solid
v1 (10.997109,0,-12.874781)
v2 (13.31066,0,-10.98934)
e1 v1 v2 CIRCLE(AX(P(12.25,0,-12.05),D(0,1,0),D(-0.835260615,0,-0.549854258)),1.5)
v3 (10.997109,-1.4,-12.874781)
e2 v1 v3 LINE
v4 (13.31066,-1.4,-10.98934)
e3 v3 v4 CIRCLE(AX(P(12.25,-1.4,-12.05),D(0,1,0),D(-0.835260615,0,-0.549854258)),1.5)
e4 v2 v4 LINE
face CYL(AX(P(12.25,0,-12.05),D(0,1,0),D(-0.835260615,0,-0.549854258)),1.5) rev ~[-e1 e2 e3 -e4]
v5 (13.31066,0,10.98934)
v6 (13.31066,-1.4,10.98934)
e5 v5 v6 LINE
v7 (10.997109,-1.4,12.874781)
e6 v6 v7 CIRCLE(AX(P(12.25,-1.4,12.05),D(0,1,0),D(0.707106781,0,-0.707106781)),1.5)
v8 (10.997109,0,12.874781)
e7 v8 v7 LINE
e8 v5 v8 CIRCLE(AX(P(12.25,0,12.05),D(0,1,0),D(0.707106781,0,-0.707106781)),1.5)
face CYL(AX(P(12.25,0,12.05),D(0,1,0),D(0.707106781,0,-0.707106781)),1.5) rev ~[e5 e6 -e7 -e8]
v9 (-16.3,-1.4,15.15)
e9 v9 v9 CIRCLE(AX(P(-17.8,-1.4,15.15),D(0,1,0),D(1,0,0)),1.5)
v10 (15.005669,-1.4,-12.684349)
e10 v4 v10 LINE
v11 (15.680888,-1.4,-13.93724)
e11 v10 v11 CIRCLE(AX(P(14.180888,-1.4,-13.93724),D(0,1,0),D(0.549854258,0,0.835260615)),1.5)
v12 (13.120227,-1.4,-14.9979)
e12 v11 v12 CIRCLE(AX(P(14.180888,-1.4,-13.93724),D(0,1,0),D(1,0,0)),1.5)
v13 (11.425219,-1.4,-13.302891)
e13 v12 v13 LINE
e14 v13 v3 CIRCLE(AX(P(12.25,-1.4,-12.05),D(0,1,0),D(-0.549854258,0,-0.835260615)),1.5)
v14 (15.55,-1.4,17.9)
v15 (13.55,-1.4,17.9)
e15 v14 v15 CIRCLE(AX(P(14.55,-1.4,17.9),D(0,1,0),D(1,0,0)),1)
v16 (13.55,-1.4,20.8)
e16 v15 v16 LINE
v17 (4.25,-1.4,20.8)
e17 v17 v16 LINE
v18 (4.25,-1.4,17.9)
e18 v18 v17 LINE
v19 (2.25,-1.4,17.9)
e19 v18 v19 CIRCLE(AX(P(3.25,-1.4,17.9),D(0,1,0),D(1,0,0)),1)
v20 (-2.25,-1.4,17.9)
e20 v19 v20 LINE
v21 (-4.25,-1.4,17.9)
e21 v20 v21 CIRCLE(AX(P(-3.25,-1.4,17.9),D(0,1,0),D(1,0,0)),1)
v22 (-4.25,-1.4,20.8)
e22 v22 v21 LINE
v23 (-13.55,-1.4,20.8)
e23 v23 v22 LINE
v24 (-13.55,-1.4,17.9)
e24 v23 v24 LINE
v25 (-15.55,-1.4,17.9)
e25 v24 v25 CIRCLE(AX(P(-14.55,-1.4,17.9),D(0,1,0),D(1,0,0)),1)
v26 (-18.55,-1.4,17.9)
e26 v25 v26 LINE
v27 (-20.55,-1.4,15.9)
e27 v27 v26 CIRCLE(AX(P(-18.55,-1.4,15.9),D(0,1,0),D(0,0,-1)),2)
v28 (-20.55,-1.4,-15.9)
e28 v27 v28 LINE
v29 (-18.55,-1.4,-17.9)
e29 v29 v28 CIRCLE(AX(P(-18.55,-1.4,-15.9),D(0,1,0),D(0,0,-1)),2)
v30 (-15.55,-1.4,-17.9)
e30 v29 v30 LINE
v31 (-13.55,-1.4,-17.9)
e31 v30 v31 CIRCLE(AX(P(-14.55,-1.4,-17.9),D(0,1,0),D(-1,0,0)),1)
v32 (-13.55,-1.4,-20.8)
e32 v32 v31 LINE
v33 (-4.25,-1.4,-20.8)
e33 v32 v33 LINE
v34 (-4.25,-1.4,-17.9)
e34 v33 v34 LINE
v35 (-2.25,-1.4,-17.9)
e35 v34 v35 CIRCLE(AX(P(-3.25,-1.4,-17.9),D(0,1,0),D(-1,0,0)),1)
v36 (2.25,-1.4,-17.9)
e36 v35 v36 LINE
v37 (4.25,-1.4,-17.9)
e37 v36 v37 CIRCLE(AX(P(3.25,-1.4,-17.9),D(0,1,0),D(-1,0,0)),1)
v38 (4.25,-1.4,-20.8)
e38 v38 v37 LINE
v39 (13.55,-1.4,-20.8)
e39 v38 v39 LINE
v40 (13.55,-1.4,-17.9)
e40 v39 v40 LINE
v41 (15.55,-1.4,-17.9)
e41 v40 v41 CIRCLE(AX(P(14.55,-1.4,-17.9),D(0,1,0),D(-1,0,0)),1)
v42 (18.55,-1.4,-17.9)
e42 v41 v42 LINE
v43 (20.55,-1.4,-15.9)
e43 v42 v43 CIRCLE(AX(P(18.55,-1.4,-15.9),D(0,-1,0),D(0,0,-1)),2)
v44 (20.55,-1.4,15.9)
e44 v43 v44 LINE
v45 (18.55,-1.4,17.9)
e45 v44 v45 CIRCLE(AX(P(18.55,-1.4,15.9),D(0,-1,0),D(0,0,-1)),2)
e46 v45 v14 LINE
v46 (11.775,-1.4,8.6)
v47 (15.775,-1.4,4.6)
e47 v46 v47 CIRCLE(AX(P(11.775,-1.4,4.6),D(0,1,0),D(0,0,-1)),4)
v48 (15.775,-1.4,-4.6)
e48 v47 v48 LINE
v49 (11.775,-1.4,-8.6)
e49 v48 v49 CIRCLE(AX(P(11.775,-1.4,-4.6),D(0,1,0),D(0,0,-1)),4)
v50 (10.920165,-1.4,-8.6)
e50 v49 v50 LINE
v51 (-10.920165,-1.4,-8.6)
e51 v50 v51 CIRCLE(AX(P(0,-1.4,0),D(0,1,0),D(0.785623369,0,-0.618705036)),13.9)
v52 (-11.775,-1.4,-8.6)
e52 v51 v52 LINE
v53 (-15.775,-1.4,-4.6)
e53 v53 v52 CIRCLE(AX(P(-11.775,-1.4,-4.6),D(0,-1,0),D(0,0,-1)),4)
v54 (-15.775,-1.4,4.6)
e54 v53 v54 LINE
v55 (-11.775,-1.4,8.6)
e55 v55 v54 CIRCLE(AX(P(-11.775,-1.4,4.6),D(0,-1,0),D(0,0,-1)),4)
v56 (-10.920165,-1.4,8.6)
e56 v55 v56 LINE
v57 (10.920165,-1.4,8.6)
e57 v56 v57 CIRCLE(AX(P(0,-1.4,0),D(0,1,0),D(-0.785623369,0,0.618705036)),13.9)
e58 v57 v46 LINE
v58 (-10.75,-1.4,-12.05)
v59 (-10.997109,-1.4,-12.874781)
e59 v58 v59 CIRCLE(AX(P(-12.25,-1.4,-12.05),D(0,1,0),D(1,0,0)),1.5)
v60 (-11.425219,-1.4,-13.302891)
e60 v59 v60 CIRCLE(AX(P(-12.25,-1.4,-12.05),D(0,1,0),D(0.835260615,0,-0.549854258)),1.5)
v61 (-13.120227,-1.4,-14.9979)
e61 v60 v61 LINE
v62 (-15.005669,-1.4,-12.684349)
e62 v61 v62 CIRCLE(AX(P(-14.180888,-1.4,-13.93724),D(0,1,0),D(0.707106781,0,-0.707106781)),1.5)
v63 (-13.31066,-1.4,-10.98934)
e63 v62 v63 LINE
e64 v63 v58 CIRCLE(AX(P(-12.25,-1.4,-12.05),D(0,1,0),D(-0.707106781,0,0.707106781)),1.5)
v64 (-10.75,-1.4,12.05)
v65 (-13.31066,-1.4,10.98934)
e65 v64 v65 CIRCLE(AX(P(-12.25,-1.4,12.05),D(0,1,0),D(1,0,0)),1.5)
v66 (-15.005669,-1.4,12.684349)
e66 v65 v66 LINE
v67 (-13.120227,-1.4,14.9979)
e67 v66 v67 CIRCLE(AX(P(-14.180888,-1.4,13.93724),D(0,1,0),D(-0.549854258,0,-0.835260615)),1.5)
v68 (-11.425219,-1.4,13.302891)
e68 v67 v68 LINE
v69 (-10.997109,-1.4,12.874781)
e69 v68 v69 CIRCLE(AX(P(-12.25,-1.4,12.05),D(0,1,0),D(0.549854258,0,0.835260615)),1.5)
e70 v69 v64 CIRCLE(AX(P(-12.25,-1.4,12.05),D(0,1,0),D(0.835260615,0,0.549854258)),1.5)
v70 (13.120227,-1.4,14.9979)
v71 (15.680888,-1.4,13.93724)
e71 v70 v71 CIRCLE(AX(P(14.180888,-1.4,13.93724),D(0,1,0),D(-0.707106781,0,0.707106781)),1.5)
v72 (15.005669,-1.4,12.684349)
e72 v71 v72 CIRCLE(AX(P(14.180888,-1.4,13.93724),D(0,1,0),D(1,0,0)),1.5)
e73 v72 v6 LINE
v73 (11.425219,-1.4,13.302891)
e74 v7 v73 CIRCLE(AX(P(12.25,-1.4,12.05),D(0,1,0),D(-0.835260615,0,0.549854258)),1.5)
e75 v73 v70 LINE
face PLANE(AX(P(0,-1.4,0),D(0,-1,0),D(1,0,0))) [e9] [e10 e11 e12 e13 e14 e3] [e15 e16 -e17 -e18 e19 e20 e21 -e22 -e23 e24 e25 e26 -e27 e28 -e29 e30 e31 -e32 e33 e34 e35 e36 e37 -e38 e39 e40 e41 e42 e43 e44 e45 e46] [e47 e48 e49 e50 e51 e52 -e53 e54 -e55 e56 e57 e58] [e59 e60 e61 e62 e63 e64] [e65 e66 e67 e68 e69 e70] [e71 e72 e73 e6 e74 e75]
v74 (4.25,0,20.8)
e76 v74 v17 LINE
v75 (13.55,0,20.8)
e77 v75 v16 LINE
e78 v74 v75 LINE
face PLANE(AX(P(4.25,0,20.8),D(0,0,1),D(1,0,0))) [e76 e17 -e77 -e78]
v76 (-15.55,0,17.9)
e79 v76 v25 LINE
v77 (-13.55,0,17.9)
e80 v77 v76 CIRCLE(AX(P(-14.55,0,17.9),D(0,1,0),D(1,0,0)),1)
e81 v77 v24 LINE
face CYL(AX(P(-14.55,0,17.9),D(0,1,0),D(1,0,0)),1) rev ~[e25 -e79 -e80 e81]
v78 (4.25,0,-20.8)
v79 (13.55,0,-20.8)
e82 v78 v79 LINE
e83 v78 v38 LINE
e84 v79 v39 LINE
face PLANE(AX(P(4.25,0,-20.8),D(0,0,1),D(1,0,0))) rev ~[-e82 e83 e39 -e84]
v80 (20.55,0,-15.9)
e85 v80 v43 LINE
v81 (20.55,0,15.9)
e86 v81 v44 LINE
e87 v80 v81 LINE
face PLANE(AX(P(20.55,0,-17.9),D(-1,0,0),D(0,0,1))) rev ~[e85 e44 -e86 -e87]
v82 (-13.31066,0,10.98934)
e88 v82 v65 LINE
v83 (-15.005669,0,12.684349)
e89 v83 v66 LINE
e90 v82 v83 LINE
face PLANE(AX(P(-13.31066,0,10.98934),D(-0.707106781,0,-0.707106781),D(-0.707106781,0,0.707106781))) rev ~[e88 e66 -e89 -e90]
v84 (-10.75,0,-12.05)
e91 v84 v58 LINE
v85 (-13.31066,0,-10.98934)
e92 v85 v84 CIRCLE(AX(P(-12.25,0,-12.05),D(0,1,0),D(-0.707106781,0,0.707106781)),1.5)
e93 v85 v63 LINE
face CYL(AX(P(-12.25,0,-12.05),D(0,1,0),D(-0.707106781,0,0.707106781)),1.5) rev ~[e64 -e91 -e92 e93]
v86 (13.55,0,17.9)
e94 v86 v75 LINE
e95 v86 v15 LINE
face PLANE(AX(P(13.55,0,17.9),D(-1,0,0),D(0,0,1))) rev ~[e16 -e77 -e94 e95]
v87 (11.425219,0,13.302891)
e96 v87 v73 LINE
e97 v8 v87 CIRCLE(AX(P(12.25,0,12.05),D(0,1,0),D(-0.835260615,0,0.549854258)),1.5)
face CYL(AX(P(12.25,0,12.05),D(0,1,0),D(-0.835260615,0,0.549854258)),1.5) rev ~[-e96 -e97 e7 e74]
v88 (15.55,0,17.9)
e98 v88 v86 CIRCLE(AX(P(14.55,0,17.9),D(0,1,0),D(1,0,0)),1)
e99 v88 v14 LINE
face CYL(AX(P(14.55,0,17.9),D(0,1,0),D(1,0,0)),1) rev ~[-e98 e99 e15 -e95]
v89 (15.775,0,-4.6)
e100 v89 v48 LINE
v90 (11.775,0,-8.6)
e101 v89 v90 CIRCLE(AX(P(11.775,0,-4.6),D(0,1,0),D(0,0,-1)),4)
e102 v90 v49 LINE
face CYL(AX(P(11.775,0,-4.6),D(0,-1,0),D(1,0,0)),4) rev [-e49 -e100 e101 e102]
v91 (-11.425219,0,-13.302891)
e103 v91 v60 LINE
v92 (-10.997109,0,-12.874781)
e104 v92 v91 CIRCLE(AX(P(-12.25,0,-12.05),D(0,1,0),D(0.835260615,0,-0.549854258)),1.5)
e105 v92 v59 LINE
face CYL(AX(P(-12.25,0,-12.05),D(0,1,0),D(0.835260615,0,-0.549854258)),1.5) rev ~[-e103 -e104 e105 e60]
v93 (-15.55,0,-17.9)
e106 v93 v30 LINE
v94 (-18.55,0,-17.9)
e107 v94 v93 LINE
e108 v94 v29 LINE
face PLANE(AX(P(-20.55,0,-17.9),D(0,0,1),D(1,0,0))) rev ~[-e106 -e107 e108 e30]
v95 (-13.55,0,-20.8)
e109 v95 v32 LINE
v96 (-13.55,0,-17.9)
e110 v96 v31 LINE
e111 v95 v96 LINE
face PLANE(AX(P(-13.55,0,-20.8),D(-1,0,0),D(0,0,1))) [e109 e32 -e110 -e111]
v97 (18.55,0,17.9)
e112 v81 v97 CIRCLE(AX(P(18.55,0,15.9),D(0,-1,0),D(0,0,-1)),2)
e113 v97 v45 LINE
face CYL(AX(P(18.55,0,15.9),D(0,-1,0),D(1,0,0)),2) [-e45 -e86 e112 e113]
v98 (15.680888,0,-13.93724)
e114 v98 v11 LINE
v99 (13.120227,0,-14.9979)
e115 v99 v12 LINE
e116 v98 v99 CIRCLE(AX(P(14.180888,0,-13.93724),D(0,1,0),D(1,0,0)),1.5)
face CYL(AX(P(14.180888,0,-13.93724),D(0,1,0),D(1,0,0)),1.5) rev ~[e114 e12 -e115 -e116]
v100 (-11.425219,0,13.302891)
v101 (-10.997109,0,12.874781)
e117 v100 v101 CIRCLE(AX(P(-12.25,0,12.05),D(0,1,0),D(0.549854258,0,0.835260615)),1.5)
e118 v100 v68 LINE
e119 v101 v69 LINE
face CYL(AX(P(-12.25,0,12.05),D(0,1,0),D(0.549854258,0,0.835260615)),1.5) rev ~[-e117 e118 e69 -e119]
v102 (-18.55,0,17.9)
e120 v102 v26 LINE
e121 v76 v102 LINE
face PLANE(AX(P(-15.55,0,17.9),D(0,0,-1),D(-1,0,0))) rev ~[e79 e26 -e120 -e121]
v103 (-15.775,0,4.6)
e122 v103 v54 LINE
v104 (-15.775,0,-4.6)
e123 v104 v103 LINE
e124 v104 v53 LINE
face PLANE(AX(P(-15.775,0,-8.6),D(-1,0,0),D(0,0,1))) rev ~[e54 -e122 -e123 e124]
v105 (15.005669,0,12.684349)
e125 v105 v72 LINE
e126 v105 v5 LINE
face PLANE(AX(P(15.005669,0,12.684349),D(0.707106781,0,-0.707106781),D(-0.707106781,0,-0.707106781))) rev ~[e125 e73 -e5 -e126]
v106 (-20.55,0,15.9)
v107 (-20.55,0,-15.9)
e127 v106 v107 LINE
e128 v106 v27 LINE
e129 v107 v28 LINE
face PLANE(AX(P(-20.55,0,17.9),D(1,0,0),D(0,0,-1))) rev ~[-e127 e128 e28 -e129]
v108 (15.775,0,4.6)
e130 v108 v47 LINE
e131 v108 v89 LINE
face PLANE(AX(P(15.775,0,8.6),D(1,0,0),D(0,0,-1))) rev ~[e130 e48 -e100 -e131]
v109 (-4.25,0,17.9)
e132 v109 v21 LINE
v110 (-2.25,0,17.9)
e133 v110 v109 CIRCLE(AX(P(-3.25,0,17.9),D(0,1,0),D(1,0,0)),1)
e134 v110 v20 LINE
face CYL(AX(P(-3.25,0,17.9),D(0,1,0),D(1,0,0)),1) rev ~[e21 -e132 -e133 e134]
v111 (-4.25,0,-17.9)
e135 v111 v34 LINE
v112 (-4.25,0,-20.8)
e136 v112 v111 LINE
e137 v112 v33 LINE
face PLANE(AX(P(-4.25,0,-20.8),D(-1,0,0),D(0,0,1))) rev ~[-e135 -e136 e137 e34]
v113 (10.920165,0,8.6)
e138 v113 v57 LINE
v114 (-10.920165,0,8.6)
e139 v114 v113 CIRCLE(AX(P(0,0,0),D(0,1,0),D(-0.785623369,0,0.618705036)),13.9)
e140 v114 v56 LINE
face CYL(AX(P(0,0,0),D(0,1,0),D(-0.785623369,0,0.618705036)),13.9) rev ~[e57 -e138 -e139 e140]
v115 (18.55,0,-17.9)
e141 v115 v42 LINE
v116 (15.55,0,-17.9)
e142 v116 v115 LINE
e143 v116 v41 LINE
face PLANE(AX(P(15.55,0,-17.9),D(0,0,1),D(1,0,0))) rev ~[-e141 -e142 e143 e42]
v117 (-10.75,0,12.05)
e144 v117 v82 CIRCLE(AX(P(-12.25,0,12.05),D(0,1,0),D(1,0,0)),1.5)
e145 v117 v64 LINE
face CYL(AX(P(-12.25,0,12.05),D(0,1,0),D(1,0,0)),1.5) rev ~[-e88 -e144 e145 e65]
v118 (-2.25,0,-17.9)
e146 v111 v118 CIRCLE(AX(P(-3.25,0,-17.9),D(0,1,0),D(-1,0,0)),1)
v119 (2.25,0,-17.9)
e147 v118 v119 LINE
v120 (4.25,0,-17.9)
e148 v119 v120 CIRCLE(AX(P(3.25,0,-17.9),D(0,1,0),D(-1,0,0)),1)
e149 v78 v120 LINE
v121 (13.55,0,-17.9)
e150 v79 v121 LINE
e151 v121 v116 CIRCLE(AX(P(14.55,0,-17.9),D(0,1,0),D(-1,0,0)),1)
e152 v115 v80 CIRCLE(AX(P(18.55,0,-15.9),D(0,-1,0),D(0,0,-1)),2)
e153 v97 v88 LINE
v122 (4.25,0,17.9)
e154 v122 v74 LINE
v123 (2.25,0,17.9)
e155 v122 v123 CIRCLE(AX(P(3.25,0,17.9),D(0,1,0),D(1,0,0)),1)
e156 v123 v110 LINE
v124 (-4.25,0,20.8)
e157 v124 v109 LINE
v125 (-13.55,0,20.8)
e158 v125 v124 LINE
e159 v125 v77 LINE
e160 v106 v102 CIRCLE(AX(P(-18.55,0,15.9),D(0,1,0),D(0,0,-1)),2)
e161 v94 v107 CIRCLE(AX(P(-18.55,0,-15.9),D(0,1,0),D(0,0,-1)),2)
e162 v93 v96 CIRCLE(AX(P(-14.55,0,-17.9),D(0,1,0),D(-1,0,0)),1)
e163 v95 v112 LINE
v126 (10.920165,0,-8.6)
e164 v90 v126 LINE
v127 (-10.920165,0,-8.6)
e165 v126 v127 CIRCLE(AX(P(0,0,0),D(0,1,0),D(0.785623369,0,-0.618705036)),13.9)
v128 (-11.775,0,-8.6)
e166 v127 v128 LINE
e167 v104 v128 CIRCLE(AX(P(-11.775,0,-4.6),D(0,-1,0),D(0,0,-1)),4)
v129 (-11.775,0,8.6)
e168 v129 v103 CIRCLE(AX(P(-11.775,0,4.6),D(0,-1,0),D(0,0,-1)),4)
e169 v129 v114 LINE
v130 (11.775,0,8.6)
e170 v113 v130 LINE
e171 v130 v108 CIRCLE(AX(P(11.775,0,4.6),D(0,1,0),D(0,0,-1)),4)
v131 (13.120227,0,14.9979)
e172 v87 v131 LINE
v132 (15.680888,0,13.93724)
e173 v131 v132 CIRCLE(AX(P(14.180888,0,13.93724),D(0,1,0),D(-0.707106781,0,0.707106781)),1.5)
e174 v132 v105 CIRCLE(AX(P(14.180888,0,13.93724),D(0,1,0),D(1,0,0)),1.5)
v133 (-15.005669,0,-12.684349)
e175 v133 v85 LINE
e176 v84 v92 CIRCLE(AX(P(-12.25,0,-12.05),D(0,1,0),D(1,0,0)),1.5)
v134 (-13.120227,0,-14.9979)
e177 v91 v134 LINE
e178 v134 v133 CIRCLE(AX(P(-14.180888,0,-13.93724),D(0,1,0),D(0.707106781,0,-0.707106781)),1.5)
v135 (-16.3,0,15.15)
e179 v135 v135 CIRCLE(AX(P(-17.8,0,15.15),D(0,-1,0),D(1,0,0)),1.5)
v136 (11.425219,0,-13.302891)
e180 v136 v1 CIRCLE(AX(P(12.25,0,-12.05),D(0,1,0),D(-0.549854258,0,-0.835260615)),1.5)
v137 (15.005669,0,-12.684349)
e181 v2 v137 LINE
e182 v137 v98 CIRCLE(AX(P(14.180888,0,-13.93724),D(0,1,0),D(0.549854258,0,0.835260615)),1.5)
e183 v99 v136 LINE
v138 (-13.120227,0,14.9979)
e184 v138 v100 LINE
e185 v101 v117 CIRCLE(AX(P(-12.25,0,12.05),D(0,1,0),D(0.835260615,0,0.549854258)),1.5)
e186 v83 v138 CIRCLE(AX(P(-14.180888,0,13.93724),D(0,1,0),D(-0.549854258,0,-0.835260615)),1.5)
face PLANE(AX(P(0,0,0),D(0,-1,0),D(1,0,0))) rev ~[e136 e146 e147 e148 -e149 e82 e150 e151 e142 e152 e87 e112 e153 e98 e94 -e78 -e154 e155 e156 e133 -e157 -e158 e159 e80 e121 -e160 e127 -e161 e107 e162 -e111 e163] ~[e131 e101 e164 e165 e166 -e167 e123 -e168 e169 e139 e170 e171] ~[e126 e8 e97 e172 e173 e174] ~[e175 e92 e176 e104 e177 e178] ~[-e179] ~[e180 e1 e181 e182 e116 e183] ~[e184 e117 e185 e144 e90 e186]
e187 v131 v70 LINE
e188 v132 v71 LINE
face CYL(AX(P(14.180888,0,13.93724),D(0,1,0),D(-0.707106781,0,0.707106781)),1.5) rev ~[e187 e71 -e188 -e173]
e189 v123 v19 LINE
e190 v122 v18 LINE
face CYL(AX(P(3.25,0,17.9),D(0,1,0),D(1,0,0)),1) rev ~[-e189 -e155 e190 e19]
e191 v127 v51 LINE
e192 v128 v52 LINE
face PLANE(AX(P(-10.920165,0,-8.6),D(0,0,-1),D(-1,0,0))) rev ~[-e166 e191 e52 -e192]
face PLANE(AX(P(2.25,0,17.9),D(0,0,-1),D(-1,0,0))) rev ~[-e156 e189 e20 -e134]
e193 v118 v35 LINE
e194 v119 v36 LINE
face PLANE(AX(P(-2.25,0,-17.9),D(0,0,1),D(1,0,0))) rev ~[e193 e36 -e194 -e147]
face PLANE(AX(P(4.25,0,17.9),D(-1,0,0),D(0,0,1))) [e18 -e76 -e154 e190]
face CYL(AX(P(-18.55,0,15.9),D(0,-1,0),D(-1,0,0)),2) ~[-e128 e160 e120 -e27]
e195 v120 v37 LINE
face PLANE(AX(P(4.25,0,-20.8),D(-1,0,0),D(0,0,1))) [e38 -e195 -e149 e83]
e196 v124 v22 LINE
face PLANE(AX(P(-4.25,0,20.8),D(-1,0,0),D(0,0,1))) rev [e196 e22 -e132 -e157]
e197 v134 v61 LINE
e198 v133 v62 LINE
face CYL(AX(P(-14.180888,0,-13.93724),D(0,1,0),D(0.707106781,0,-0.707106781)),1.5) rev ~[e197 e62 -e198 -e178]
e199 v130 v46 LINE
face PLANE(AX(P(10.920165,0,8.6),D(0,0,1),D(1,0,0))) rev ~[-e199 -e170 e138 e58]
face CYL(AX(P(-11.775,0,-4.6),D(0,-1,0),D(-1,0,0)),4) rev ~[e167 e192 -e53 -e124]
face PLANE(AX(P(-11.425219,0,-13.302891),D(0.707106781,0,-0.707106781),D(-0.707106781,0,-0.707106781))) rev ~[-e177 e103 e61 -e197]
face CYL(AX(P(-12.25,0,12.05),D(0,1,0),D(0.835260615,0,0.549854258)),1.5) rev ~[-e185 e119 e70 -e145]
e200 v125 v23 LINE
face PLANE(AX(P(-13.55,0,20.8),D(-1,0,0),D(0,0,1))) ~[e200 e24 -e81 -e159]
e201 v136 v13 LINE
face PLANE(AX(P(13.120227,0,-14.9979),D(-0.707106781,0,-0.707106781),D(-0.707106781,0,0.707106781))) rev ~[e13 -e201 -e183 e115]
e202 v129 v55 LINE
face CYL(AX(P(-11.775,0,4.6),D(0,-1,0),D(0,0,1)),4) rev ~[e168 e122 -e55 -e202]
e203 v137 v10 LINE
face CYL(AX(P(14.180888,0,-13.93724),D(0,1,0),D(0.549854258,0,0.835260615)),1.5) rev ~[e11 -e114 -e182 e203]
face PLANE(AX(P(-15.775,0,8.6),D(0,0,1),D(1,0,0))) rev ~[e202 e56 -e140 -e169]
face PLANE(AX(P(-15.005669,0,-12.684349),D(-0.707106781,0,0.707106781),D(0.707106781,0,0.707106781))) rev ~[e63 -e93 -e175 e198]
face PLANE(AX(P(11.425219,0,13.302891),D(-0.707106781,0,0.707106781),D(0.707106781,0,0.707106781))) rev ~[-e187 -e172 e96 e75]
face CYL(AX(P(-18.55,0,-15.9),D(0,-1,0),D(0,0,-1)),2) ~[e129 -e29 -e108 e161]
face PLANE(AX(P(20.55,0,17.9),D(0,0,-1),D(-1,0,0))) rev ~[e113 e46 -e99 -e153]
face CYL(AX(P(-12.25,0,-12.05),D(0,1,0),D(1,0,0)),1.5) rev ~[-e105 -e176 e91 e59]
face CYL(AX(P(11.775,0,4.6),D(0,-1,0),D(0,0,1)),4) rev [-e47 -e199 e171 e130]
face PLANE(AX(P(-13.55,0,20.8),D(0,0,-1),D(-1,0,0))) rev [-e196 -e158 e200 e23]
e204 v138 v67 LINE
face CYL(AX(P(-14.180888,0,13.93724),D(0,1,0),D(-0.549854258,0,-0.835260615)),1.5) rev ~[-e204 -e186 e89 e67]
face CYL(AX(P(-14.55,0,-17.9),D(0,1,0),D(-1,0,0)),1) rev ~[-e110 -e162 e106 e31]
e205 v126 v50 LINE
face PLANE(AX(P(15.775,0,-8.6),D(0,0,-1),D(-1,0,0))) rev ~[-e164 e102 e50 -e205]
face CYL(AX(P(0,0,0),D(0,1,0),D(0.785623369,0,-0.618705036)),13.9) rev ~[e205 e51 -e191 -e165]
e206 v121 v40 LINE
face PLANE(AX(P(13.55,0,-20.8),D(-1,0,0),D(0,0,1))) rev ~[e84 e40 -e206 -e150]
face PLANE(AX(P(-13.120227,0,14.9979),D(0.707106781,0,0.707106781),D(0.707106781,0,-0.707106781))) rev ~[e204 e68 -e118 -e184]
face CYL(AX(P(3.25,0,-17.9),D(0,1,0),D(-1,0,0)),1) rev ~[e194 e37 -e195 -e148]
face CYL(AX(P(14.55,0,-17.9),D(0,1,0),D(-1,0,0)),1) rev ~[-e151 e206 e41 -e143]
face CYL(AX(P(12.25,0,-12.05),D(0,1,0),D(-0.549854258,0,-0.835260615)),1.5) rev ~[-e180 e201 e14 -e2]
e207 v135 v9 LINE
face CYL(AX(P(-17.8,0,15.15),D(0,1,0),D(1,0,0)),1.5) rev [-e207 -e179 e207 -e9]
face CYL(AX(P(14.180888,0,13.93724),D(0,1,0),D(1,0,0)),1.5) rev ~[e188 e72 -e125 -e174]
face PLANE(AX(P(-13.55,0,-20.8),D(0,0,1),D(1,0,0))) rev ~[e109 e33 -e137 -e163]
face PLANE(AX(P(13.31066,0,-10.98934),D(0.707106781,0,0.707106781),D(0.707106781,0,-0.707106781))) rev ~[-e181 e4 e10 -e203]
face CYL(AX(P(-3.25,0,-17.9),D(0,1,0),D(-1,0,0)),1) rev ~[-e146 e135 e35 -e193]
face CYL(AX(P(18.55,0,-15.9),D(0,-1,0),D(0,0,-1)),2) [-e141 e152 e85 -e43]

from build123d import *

# Parameters (mm, degrees)
F0_R     = 1.5
F0_W     = 9.3
F0_H     = 2.9
F1_DEPTH = 1.4
F2_R     = 4
F3_DEPTH = 2
F4_R     = 2


# Not quite as in the source:
# - a pattern or mirror of a feature is missing from the dataset's text; its kind, count and spacing are read off the source's solid
# - a feature names something its author has since deleted; it is built from what else it names


with BuildPart() as f1:
    # F0 (on Front) → F1 (new body)
    with BuildSketch(Plane.XZ):
        with BuildLine():
            Line((15.55, -17.9), (20.55, -17.9))
            Line((20.55, -17.9), (20.55, 17.9))
            Line((20.55, 17.9), (15.55, 17.9))
            ThreePointArc((15.55, 17.9), (14.55, 16.9), (13.55, 17.9))
            Line((13.55, 17.9), (4.25, 17.9))
            ThreePointArc((4.25, 17.9), (3.25, 16.9), (2.25, 17.9))
            Line((2.25, 17.9), (-2.25, 17.9))
            ThreePointArc((-2.25, 17.9), (-3.25, 16.9), (-4.25, 17.9))
            Line((-4.25, 17.9), (-13.55, 17.9))
            ThreePointArc((-13.55, 17.9), (-14.55, 16.9), (-15.55, 17.9))
            Line((-15.55, 17.9), (-20.55, 17.9))
            Line((-20.55, 17.9), (-20.55, -17.9))
            Line((-20.55, -17.9), (-15.55, -17.9))
            ThreePointArc((-15.55, -17.9), (-14.55, -16.9), (-13.55, -17.9))
            Line((-13.55, -17.9), (-4.25, -17.9))
            ThreePointArc((-4.25, -17.9), (-3.25, -16.9), (-2.25, -17.9))
            Line((-2.25, -17.9), (2.25, -17.9))
            ThreePointArc((2.25, -17.9), (3.25, -16.9), (4.25, -17.9))
            Line((4.25, -17.9), (13.55, -17.9))
            ThreePointArc((13.55, -17.9), (14.55, -16.9), (15.55, -17.9))
        make_face()
        with BuildLine():
            ThreePointArc((-13.1202274148, -14.9978997242), (-15.343659863, -14.8848474001), (-15.0056689733, -12.6843486297))
            Line((-15.0056689733, -12.6843486297), (-13.3106601718, -10.9893398282))
            ThreePointArc((-13.3106601718, -10.9893398282), (-11.6759748515, -10.6641807012), (-10.75, -12.05))
            ThreePointArc((-10.75, -12.05), (-10.8131046691, -12.4805018095), (-10.9971090773, -12.8747813867))
            ThreePointArc((-10.9971090773, -12.8747813867), (-11.1893398282, -13.1106601718), (-11.4252186133, -13.3028909227))
            Line((-11.4252186133, -13.3028909227), (-13.1202274148, -14.9978997242))
        make_face(mode=Mode.SUBTRACT)
        with BuildLine():
            Line((13.3106601718, -10.9893398282), (15.0056689733, -12.6843486297))
            ThreePointArc((15.0056689733, -12.6843486297), (15.5013367677, -13.2256118689), (15.6808875866, -13.9372395524))
            ThreePointArc((15.6808875866, -13.9372395524), (14.7549127351, -15.3230588512), (13.1202274148, -14.9978997242))
            Line((13.1202274148, -14.9978997242), (11.4252186133, -13.3028909227))
            ThreePointArc((11.4252186133, -13.3028909227), (11.1893398282, -13.1106601718), (10.9971090773, -12.8747813867))
            ThreePointArc((10.9971090773, -12.8747813867), (11.3023921523, -10.8872277235), (13.3106601718, -10.9893398282))
        make_face(mode=Mode.SUBTRACT)
        with Locations((-17.8, 15.15)):
            Circle(F0_R, mode=Mode.SUBTRACT)
        with BuildLine():
            ThreePointArc((-15.0056689733, 12.6843486297), (-15.343659863, 14.8848474001), (-13.1202274148, 14.9978997242))
            Line((-13.1202274148, 14.9978997242), (-11.4252186133, 13.3028909227))
            ThreePointArc((-11.4252186133, 13.3028909227), (-11.1893398282, 13.1106601718), (-10.9971090773, 12.8747813867))
            ThreePointArc((-10.9971090773, 12.8747813867), (-10.8131046691, 12.4805018095), (-10.75, 12.05))
            ThreePointArc((-10.75, 12.05), (-11.6759748515, 10.6641807012), (-13.3106601718, 10.9893398282))
            Line((-13.3106601718, 10.9893398282), (-15.0056689733, 12.6843486297))
        make_face(mode=Mode.SUBTRACT)
        with BuildLine():
            ThreePointArc((-10.9201648339, 8.6), (0, 13.9), (10.9201648339, 8.6))
            Line((10.9201648339, 8.6), (15.775, 8.6))
            Line((15.775, 8.6), (15.775, -8.6))
            Line((15.775, -8.6), (10.9201648339, -8.6))
            ThreePointArc((10.9201648339, -8.6), (0, -13.9), (-10.9201648339, -8.6))
            Line((-10.9201648339, -8.6), (-15.775, -8.6))
            Line((-15.775, -8.6), (-15.775, 8.6))
            Line((-15.775, 8.6), (-10.9201648339, 8.6))
        make_face(mode=Mode.SUBTRACT)
        with BuildLine():
            ThreePointArc((13.1202274148, 14.9978997242), (14.7549127351, 15.3230588512), (15.6808875866, 13.9372395524))
            ThreePointArc((15.6808875866, 13.9372395524), (15.5013367677, 13.2256118689), (15.0056689733, 12.6843486297))
            Line((15.0056689733, 12.6843486297), (13.3106601718, 10.9893398282))
            ThreePointArc((13.3106601718, 10.9893398282), (11.3023921523, 10.8872277235), (10.9971090773, 12.8747813867))
            ThreePointArc((10.9971090773, 12.8747813867), (11.1893398282, 13.1106601718), (11.4252186133, 13.3028909227))
            Line((11.4252186133, 13.3028909227), (13.1202274148, 14.9978997242))
        make_face(mode=Mode.SUBTRACT)
        with Locations((-8.9, -19.35)):
            Rectangle(F0_W, F0_H)
        with Locations((8.9, -19.35)):
            Rectangle(F0_W, F0_H)
        with Locations((8.9, 19.35)):
            Rectangle(F0_W, F0_H)
    extrude(amount=F1_DEPTH)

    # F1_copies: F1 across plane


with BuildPart() as f1_1:
    add(f1.part)
    add(f1.part.mirror(Plane.XY))

    # F2
    f2_edges = [f1_1.edges().sort_by_distance(p)[0] for p in [
        (-15.775, -0.7, 8.6),
        (-15.775, -0.7, -8.6),
        (15.775, -0.7, 8.6),
        (15.775, -0.7, -8.6),
    ]]
    fillet(f2_edges, radius=F2_R)

    # F0 (on Front) → F3 (cut)
    with BuildSketch(Plane.XZ):
        with BuildLine():
            ThreePointArc((-4.25, 17.9), (-3.25, 16.9), (-2.25, 17.9))
            Line((-2.25, 17.9), (-4.25, 17.9))
        make_face()
        with BuildLine():
            Line((-4.25, 17.9), (-2.25, 17.9))
            ThreePointArc((-2.25, 17.9), (-3.25, 18.9), (-4.25, 17.9))
        make_face()
        with Locations((-17.8, 15.15)):
            Circle(F0_R)
    extrude(amount=F3_DEPTH, mode=Mode.SUBTRACT)

    # F4
    f4_edges = [f1_1.edges().sort_by_distance(p)[0] for p in [
        (-20.55, -0.7, 17.9),
        (20.55, -0.7, 17.9),
        (20.55, -0.7, -17.9),
        (-20.55, -0.7, -17.9),
    ]]
    fillet(f4_edges, radius=F4_R)


solid = f1_1.part
